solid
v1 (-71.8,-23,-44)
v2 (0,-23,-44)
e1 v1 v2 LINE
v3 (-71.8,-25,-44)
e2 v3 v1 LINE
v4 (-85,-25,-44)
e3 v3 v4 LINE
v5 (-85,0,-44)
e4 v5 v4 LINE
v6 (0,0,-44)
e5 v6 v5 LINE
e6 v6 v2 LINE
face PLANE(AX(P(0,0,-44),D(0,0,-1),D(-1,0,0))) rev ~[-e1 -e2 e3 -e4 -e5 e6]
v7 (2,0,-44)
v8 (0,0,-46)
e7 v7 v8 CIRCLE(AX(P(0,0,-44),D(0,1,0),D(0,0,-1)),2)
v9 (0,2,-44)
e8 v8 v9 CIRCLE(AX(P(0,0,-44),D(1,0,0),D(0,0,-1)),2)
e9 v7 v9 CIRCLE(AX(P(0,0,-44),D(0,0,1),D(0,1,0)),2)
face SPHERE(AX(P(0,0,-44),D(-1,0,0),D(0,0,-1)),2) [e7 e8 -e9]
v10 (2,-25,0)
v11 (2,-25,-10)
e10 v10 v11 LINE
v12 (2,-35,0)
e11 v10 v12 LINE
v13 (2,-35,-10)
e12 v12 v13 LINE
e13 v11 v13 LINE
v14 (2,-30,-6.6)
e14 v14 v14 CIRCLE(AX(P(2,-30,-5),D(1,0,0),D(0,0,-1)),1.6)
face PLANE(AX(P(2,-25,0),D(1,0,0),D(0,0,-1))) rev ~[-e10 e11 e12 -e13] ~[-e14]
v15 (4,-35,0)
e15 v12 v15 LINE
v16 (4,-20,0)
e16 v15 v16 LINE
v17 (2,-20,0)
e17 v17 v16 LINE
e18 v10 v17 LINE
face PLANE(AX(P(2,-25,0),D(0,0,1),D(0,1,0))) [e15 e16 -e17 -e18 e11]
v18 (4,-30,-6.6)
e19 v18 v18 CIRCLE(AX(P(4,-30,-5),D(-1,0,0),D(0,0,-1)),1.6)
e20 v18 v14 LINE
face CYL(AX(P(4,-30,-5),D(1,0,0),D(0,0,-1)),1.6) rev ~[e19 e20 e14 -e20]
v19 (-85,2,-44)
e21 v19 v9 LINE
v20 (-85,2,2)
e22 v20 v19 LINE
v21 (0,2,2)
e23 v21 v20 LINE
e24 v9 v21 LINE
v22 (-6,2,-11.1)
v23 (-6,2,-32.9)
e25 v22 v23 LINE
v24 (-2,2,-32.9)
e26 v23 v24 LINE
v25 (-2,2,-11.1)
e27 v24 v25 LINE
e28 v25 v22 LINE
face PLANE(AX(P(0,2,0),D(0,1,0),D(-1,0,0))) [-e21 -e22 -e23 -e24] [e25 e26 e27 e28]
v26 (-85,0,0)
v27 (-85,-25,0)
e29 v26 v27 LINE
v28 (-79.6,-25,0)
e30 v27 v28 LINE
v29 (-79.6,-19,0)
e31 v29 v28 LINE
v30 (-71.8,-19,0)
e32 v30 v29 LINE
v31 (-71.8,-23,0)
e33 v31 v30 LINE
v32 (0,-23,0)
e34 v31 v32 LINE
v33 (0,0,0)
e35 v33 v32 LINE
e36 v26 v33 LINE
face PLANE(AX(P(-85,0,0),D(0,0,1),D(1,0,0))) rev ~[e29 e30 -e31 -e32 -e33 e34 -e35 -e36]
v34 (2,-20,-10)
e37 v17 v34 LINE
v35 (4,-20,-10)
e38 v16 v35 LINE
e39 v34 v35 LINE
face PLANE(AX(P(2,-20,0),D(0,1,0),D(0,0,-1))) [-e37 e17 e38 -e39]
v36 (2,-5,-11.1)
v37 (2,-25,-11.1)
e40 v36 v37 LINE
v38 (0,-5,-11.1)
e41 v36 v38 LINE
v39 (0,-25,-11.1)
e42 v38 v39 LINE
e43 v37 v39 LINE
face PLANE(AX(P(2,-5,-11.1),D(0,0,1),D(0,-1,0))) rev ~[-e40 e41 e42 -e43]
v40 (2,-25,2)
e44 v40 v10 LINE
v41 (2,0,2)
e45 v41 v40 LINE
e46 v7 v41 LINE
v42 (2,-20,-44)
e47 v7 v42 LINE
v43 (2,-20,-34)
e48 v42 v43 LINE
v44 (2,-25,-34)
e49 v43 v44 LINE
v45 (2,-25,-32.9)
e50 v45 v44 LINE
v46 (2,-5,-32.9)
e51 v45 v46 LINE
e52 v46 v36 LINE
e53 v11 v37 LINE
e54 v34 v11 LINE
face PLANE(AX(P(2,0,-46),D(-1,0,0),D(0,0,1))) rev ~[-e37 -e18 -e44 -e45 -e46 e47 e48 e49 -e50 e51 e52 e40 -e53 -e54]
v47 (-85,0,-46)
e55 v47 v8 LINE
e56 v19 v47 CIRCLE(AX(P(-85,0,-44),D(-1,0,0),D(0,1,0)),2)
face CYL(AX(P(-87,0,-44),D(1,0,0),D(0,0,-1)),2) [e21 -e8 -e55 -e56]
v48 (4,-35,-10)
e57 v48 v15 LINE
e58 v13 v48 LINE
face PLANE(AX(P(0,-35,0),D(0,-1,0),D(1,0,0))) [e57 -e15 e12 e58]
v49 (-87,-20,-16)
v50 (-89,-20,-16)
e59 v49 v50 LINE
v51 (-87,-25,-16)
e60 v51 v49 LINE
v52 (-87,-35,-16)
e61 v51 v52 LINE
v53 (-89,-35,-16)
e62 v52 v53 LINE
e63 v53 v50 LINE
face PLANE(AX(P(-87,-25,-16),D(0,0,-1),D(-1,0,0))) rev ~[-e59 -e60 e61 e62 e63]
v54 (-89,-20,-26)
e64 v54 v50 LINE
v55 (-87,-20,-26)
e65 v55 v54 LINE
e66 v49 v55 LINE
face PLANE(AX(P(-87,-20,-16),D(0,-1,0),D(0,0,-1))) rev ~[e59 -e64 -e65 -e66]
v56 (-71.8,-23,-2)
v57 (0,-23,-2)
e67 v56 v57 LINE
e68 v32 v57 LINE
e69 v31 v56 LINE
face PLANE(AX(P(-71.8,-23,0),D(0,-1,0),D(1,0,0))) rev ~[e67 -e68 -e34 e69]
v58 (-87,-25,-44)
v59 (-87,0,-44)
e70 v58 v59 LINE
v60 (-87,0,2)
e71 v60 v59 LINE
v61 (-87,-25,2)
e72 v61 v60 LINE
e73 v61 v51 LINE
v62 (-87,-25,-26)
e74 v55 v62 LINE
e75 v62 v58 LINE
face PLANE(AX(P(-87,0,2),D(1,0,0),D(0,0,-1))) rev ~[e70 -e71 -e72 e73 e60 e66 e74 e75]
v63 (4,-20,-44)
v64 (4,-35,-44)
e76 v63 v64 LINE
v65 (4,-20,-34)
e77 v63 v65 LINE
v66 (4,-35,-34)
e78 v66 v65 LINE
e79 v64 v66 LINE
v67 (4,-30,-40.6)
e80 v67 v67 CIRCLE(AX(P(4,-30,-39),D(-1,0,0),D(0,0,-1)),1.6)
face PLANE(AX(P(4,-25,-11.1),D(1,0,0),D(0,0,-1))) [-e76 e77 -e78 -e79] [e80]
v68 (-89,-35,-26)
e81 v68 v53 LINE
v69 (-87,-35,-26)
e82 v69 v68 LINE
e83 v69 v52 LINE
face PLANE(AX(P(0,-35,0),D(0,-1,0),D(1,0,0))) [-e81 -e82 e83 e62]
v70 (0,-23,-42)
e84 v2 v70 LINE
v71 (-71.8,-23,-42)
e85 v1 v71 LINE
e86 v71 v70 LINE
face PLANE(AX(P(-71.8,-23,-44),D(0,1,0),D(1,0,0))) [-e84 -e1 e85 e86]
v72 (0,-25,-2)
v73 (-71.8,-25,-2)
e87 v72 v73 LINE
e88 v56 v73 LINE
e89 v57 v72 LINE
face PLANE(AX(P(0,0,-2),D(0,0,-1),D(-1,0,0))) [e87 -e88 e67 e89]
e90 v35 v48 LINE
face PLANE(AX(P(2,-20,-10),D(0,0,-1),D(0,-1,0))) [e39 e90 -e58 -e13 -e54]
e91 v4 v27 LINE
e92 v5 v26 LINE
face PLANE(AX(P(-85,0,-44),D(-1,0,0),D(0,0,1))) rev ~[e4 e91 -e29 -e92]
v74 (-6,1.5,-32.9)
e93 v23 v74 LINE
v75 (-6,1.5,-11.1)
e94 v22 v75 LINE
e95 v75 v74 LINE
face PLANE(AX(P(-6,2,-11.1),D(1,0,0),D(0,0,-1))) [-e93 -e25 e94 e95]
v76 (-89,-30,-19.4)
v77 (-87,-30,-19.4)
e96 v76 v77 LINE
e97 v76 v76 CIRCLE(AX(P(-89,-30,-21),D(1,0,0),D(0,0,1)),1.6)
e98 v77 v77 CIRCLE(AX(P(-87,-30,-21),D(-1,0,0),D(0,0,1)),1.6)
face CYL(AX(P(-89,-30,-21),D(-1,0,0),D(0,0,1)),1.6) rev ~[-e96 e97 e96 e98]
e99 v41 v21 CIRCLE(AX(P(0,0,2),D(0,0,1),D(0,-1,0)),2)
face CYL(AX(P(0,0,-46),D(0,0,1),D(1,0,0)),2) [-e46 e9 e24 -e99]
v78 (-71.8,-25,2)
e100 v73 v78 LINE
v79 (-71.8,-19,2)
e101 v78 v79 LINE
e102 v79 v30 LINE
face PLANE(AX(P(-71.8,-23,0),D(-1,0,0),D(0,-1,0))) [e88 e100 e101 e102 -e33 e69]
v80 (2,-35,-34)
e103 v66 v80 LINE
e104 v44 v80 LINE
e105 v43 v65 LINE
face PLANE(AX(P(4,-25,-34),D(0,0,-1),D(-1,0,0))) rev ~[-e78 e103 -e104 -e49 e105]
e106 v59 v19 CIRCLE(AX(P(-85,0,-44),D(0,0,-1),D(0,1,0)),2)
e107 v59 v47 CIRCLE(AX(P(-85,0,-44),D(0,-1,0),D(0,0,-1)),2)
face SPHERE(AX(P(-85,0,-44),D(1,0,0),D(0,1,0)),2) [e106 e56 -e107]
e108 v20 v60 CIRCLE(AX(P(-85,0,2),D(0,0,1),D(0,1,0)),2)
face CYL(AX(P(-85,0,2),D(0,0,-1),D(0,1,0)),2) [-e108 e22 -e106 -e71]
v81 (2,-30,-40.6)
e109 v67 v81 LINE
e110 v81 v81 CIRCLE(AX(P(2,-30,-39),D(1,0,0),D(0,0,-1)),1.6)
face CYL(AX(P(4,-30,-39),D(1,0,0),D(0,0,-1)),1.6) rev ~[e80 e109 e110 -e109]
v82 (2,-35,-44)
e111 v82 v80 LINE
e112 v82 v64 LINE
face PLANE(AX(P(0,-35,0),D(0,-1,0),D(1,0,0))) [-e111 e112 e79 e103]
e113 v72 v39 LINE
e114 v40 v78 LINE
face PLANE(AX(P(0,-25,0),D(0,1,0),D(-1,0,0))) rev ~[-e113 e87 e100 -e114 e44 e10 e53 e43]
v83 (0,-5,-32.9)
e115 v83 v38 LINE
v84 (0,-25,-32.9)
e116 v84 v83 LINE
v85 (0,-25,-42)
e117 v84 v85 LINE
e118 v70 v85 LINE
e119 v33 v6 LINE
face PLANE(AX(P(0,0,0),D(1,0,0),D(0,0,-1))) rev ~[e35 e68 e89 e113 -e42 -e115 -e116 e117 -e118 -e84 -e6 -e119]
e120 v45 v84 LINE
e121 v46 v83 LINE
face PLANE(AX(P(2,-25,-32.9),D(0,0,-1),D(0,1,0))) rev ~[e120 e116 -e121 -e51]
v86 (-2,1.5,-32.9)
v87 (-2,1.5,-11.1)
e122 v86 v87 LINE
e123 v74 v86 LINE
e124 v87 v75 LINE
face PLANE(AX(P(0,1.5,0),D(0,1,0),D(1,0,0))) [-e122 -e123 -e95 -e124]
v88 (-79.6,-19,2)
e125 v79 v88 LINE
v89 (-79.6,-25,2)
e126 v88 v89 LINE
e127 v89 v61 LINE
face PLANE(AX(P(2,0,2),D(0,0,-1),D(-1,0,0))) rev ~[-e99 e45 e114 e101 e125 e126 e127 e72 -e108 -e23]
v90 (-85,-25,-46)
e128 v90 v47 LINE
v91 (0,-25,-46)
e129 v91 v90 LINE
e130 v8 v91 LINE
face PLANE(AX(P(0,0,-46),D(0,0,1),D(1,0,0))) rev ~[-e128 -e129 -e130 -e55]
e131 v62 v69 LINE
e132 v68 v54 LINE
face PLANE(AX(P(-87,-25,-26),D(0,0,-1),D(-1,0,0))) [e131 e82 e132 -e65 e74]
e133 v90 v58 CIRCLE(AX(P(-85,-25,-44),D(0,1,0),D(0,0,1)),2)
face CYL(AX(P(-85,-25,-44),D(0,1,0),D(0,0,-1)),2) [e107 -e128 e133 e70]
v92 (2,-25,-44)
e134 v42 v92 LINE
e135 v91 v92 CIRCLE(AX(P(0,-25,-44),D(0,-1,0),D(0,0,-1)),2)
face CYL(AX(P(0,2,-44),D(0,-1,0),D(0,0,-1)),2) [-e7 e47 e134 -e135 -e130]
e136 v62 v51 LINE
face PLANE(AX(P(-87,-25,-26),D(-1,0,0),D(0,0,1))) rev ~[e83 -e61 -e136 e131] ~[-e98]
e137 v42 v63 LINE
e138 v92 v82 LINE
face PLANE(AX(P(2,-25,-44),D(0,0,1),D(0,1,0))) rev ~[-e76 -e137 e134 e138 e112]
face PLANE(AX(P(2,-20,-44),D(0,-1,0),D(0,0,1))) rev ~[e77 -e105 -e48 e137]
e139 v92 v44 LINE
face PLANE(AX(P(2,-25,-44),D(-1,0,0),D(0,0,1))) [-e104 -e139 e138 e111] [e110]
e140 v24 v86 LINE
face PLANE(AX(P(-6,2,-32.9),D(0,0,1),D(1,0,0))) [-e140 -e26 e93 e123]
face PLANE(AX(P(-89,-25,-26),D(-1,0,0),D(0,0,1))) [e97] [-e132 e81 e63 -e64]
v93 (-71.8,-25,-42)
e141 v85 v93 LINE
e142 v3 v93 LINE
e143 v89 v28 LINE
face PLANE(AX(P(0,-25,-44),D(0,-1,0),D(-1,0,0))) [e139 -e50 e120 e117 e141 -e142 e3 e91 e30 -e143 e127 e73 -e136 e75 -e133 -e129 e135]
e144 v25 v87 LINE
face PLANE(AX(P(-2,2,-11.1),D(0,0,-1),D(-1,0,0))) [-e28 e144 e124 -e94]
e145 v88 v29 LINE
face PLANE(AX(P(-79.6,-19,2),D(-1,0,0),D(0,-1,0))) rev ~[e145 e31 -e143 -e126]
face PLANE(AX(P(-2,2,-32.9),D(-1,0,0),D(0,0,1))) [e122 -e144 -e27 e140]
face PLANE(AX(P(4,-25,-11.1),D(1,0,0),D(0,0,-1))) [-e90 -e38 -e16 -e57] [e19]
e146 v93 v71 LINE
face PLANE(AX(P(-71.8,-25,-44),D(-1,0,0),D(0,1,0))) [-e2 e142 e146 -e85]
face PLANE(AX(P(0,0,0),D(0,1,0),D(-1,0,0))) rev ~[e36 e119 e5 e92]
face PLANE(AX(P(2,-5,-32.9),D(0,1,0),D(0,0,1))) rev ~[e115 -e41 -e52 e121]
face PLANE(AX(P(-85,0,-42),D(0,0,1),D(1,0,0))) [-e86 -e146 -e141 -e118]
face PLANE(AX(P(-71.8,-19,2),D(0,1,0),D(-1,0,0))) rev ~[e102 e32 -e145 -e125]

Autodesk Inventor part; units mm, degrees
ref_plane "YZ Plane" through (0, 0, 0) normal (1, 0, 0) x (0, 1, 0)
ref_plane "XZ Plane" through (0, 0, 0) normal (0, 1, 0) x (-1, 0, 0)
ref_plane "XY Plane" through (0, 0, 0) normal (0, 0, 1) x (1, 0, 0)
sketch "Sketch1" plane through (0, 0, 0) normal (0, 1, 0) x (-1, 0, 0)
  line L0 (0, 0) -> (0, -44)
  line L1 (0, -44) -> (85, -44)
  line L2 (85, -44) -> (85, 0)
  line L3 (85, 0) -> (0, 0)
  line L4 (0, -46) -> (-2, -46)
  line L5 (-2, -46) -> (-2, 0)
  line L6 (-2, 0) -> (-2, 2)
  line L7 (-2, 2) -> (85, 2)
  line L8 (85, 2) -> (87, 2)
  line L9 (87, 2) -> (87, -46)
  line L10 (87, -46) -> (0, -46)
  dimension "d0" = 44
  dimension "d2" = 2
  dimension "d3" = 2
  dimension "d4" = 2
  dimension "d5" = 2
extrude "Extrusion1" add sketch "Sketch1" along normal blind 2 contours L3 L2 L1 L0 | L4 L5 L6 L7 L8 L9 L10
extrude "Extrusion2" add sketch "Sketch1" against normal blind 25
sketch "Sketch2" plane through (2, 2, 2) normal (1, 0, 0) x (0, 0, -1)
  point P0 (2, -2)
sketch "Sketch3" plane through (2, 2, 2) normal (1, 0, 0) x (0, 0, -1)
  line L0 (0, -27) -> (13.1, -27)
  line L1 (46, -27) -> (2, -27) projected
  line L2 (0, -27) -> (48, -27) projected
  line L3 (48, -27) -> (34.9, -27)
  line L4 (34.9, -27) -> (34.9, -7)
  line L5 (34.9, -7) -> (13.1, -7)
  line L6 (13.1, -7) -> (13.1, -27)
  line L7 (13.1, -27) -> (34.9, -27)
  point P0 (2, -2)
  dimension "d10" = 13.1
  dimension "d11" = 13.1
  dimension "d12" = 20
extrude "Extrusion3" cut sketch "Sketch3" against normal blind 25
fillet "Fillet1" radius 2 5 edges at (-42.5, 2, -46) (2, -11.5, -46) (2, 2, -22) (-87, 2, -22) (-87, -11.5, -46)
sketch "Sketch4" plane through (-87, -25, 2) normal (0, 0, 1) x (1, 0, 0)
  line L0 (2, 0) -> (0, 0) projected
  line L1 (0, 0) -> (7.4, 0)
  line L2 (87, 0) -> (2, 0) projected
  line L3 (7.4, 0) -> (15.2, 0)
  line L4 (15.2, 0) -> (15.2, 6)
  line L5 (15.2, 6) -> (7.4, 6)
  line L6 (7.4, 6) -> (7.4, 0)
  point P0 (87, 25)
  dimension "d16" = 7.4
  dimension "d17" = 7.8
  dimension "d18" = 6
extrude "Extrusion4" cut sketch "Sketch4" against normal blind 25
sketch "Sketch5" plane through (0, 2, 0) normal (0, 1, 0) x (1, 0, 0)
  line L0 (2, 32.9) -> (0, 32.9) projected
  line L1 (0, 11.1) -> (2, 11.1) projected
  line L2 (0, 32.9) -> (0, 11.1)
  line L3 (0, 11.1) -> (-2, 11.1)
  line L4 (-2, 11.1) -> (-6, 11.1)
  line L5 (-6, 11.1) -> (-6, 32.9)
  line L6 (-6, 32.9) -> (-2, 32.9)
  line L7 (-2, 32.9) -> (-2, 11.1)
  point P0 (0, 0)
  dimension "d21" = 2
  dimension "d22" = 4
  dimension "d23" = 4
extrude "Extrusion5" cut sketch "Sketch5" against normal blind 0.5
sketch "Sketch6" plane through (-87, -25, -44) normal (-1, 0, 0) x (0, 0, 1)
  line L0 (46, 25) -> (0, 25) projected
  line L1 (23, 25) -> (23, 0)
  line L2 (46, 0) -> (0, 0) projected
  line L3 (23, 0) -> (28, 0)
  line L4 (28, 0) -> (28, 5)
  line L5 (28, 5) -> (18, 5)
  line L6 (18, 5) -> (18, 0)
  line L7 (23, 0) -> (18, 0)
  point P0 (44, 25)
  dimension "d26" = 5
  dimension "d27" = 5
  dimension "d28" = 10
extrude "Extrusion6" add sketch "Sketch6" along normal blind 2
sketch "Sketch7" plane through (0, -25, 0) normal (0, -1, 0) x (1, 0, 0)
  line L0 (-87, -44) -> (-87, 2) projected
  line L1 (-87, -26) -> (-89, -26) projected
  line L2 (-87, -15.9645) -> (-87, -26)
  line L3 (-87, -26) -> (-89, -26)
  line L4 (-89, -26) -> (-89, -16) projected
  line L5 (-89, -26) -> (-89, -16)
  line L6 (-87, -16) -> (-89, -16) projected
  line L7 (-89, -16) -> (-87, -16)
  point P0 (0, 0)
extrude "Extrusion7" add sketch "Sketch7" along normal blind 10
sketch "Sketch8" plane through (-89, -25, -44) normal (-1, 0, 0) x (0, 0, 1)
  line L0 (28, 0) -> (18, 0) projected
  line L1 (18, 0) -> (23, 0)
  line L2 (23, 0) -> (23, -5)
  circle A0 centre (23, -5) radius 1.6
  point P0 (44, 25)
  dimension "d33" = 5
  dimension "d34" = 3.2
extrude "Extrusion8" cut sketch "Sketch8" against normal blind 10
sketch "Sketch9" plane through (2, -25, -11.1) normal (1, 0, 0) x (0, 0, -1)
  line L0 (-13.1, 0) -> (4.9, 0) projected
  line L1 (-13.1, 0) -> (-11.1, 0)
  line L2 (-11.1, 0) -> (-11.1, 5)
  line L3 (-11.1, 6) -> (-11.1, 0) projected
  line L4 (-11.1, 5) -> (-1.1, 5)
  line L5 (-1.1, 5) -> (-1.1, 0)
  line L6 (-1.1, 0) -> (-11.1, 0)
  line L7 (32.9, 0) -> (-11.1, 0) projected
  line L8 (32.9, 0) -> (32.9, 5)
  line L9 (32.9, 0) -> (32.9, 25) projected
  line L10 (32.9, 5) -> (22.9, 5)
  line L11 (22.9, 5) -> (22.9, 0)
  line L12 (22.9, 0) -> (32.9, 0)
  point P0 (-11.1, 25)
  dimension "d37" = 2
  dimension "d38" = 5
  dimension "d39" = 10
  dimension "d40" = 5
  dimension "d41" = 10
extrude "Extrusion9" add sketch "Sketch9" along normal blind 2
sketch "Sketch10" plane through (0, -25, 0) normal (0, -1, 0) x (1, 0, 0)
  line L0 (4, -10) -> (4, 0) projected
  line L1 (2, -10) -> (4, -10) projected
  line L2 (4, -10) -> (2, -10)
  line L3 (2, 0) -> (2, -10) projected
  line L4 (2, -10) -> (2, 0)
  line L5 (2, 0) -> (4, 0)
  line L6 (4, 0) -> (4, -10)
  line L7 (4, -44) -> (4, -34) projected
  line L8 (4, -34) -> (4, -44)
  line L9 (2, -44) -> (4, -44) projected
  line L10 (4, -44) -> (2, -44)
  line L11 (2, -44) -> (2, -34)
  line L12 (2, 2) -> (2, -44) projected
  line L13 (4, -34) -> (2, -34)
  point P0 (0, 0)
extrude "Extrusion10" add sketch "Sketch10" along normal blind 10
sketch "Sketch11" plane through (4, -25, -11.1) normal (1, 0, 0) x (0, 0, -1)
  line L0 (-1.1, -10) -> (-11.1, -10) projected
  line L1 (-6.1, -10) -> (-6.1, -5)
  line L2 (22.9, -10) -> (32.9, -10) projected
  line L3 (27.9, -10) -> (27.9, -5)
  circle A0 centre (-6.1, -5) radius 1.6
  circle A1 centre (27.9, -5) radius 1.6
  point P0 (-11.1, 25)
  dimension "d46" = 5
  dimension "d47" = 5
  dimension "d48" = 3.2
  dimension "d49" = 3.2
extrude "Extrusion11" cut sketch "Sketch11" against normal blind 10
sketch "Sketch12" plane through (0, 0, 0) normal (0, 0, -1) x (-1, 0, 0)
  line L0 (0, -5) -> (0, -25) projected
  line L1 (71.8, -19) -> (71.8, -25) projected
  line L2 (0, -25) -> (71.8, -25)
  line L3 (71.8, -25) -> (71.8, -23)
  line L4 (71.8, -23) -> (0, -23)
  line L5 (0, -23) -> (0, -25)
  point P0 (0, 0)
  dimension "d52" = 2
extrude "Extrusion12" add sketch "Sketch12" along normal blind 2
sketch "Sketch13" plane through (-85, 0, -44) normal (0, 0, 1) x (1, 0, 0)
  line L0 (87, -25) -> (13.2, -25) projected
  line L1 (13.2, -23) -> (85, -23) projected
  line L2 (13.2, -25) -> (13.2, -23)
  line L3 (13.2, -23) -> (85, -23)
  line L4 (85, -5) -> (85, -25) projected
  line L5 (85, -23) -> (85, -25)
  line L6 (85, -25) -> (13.2, -25)
  point P0 (85, 0)
extrude "Extrusion13" add sketch "Sketch13" along normal blind 2
properties part number "sideboard_top"
